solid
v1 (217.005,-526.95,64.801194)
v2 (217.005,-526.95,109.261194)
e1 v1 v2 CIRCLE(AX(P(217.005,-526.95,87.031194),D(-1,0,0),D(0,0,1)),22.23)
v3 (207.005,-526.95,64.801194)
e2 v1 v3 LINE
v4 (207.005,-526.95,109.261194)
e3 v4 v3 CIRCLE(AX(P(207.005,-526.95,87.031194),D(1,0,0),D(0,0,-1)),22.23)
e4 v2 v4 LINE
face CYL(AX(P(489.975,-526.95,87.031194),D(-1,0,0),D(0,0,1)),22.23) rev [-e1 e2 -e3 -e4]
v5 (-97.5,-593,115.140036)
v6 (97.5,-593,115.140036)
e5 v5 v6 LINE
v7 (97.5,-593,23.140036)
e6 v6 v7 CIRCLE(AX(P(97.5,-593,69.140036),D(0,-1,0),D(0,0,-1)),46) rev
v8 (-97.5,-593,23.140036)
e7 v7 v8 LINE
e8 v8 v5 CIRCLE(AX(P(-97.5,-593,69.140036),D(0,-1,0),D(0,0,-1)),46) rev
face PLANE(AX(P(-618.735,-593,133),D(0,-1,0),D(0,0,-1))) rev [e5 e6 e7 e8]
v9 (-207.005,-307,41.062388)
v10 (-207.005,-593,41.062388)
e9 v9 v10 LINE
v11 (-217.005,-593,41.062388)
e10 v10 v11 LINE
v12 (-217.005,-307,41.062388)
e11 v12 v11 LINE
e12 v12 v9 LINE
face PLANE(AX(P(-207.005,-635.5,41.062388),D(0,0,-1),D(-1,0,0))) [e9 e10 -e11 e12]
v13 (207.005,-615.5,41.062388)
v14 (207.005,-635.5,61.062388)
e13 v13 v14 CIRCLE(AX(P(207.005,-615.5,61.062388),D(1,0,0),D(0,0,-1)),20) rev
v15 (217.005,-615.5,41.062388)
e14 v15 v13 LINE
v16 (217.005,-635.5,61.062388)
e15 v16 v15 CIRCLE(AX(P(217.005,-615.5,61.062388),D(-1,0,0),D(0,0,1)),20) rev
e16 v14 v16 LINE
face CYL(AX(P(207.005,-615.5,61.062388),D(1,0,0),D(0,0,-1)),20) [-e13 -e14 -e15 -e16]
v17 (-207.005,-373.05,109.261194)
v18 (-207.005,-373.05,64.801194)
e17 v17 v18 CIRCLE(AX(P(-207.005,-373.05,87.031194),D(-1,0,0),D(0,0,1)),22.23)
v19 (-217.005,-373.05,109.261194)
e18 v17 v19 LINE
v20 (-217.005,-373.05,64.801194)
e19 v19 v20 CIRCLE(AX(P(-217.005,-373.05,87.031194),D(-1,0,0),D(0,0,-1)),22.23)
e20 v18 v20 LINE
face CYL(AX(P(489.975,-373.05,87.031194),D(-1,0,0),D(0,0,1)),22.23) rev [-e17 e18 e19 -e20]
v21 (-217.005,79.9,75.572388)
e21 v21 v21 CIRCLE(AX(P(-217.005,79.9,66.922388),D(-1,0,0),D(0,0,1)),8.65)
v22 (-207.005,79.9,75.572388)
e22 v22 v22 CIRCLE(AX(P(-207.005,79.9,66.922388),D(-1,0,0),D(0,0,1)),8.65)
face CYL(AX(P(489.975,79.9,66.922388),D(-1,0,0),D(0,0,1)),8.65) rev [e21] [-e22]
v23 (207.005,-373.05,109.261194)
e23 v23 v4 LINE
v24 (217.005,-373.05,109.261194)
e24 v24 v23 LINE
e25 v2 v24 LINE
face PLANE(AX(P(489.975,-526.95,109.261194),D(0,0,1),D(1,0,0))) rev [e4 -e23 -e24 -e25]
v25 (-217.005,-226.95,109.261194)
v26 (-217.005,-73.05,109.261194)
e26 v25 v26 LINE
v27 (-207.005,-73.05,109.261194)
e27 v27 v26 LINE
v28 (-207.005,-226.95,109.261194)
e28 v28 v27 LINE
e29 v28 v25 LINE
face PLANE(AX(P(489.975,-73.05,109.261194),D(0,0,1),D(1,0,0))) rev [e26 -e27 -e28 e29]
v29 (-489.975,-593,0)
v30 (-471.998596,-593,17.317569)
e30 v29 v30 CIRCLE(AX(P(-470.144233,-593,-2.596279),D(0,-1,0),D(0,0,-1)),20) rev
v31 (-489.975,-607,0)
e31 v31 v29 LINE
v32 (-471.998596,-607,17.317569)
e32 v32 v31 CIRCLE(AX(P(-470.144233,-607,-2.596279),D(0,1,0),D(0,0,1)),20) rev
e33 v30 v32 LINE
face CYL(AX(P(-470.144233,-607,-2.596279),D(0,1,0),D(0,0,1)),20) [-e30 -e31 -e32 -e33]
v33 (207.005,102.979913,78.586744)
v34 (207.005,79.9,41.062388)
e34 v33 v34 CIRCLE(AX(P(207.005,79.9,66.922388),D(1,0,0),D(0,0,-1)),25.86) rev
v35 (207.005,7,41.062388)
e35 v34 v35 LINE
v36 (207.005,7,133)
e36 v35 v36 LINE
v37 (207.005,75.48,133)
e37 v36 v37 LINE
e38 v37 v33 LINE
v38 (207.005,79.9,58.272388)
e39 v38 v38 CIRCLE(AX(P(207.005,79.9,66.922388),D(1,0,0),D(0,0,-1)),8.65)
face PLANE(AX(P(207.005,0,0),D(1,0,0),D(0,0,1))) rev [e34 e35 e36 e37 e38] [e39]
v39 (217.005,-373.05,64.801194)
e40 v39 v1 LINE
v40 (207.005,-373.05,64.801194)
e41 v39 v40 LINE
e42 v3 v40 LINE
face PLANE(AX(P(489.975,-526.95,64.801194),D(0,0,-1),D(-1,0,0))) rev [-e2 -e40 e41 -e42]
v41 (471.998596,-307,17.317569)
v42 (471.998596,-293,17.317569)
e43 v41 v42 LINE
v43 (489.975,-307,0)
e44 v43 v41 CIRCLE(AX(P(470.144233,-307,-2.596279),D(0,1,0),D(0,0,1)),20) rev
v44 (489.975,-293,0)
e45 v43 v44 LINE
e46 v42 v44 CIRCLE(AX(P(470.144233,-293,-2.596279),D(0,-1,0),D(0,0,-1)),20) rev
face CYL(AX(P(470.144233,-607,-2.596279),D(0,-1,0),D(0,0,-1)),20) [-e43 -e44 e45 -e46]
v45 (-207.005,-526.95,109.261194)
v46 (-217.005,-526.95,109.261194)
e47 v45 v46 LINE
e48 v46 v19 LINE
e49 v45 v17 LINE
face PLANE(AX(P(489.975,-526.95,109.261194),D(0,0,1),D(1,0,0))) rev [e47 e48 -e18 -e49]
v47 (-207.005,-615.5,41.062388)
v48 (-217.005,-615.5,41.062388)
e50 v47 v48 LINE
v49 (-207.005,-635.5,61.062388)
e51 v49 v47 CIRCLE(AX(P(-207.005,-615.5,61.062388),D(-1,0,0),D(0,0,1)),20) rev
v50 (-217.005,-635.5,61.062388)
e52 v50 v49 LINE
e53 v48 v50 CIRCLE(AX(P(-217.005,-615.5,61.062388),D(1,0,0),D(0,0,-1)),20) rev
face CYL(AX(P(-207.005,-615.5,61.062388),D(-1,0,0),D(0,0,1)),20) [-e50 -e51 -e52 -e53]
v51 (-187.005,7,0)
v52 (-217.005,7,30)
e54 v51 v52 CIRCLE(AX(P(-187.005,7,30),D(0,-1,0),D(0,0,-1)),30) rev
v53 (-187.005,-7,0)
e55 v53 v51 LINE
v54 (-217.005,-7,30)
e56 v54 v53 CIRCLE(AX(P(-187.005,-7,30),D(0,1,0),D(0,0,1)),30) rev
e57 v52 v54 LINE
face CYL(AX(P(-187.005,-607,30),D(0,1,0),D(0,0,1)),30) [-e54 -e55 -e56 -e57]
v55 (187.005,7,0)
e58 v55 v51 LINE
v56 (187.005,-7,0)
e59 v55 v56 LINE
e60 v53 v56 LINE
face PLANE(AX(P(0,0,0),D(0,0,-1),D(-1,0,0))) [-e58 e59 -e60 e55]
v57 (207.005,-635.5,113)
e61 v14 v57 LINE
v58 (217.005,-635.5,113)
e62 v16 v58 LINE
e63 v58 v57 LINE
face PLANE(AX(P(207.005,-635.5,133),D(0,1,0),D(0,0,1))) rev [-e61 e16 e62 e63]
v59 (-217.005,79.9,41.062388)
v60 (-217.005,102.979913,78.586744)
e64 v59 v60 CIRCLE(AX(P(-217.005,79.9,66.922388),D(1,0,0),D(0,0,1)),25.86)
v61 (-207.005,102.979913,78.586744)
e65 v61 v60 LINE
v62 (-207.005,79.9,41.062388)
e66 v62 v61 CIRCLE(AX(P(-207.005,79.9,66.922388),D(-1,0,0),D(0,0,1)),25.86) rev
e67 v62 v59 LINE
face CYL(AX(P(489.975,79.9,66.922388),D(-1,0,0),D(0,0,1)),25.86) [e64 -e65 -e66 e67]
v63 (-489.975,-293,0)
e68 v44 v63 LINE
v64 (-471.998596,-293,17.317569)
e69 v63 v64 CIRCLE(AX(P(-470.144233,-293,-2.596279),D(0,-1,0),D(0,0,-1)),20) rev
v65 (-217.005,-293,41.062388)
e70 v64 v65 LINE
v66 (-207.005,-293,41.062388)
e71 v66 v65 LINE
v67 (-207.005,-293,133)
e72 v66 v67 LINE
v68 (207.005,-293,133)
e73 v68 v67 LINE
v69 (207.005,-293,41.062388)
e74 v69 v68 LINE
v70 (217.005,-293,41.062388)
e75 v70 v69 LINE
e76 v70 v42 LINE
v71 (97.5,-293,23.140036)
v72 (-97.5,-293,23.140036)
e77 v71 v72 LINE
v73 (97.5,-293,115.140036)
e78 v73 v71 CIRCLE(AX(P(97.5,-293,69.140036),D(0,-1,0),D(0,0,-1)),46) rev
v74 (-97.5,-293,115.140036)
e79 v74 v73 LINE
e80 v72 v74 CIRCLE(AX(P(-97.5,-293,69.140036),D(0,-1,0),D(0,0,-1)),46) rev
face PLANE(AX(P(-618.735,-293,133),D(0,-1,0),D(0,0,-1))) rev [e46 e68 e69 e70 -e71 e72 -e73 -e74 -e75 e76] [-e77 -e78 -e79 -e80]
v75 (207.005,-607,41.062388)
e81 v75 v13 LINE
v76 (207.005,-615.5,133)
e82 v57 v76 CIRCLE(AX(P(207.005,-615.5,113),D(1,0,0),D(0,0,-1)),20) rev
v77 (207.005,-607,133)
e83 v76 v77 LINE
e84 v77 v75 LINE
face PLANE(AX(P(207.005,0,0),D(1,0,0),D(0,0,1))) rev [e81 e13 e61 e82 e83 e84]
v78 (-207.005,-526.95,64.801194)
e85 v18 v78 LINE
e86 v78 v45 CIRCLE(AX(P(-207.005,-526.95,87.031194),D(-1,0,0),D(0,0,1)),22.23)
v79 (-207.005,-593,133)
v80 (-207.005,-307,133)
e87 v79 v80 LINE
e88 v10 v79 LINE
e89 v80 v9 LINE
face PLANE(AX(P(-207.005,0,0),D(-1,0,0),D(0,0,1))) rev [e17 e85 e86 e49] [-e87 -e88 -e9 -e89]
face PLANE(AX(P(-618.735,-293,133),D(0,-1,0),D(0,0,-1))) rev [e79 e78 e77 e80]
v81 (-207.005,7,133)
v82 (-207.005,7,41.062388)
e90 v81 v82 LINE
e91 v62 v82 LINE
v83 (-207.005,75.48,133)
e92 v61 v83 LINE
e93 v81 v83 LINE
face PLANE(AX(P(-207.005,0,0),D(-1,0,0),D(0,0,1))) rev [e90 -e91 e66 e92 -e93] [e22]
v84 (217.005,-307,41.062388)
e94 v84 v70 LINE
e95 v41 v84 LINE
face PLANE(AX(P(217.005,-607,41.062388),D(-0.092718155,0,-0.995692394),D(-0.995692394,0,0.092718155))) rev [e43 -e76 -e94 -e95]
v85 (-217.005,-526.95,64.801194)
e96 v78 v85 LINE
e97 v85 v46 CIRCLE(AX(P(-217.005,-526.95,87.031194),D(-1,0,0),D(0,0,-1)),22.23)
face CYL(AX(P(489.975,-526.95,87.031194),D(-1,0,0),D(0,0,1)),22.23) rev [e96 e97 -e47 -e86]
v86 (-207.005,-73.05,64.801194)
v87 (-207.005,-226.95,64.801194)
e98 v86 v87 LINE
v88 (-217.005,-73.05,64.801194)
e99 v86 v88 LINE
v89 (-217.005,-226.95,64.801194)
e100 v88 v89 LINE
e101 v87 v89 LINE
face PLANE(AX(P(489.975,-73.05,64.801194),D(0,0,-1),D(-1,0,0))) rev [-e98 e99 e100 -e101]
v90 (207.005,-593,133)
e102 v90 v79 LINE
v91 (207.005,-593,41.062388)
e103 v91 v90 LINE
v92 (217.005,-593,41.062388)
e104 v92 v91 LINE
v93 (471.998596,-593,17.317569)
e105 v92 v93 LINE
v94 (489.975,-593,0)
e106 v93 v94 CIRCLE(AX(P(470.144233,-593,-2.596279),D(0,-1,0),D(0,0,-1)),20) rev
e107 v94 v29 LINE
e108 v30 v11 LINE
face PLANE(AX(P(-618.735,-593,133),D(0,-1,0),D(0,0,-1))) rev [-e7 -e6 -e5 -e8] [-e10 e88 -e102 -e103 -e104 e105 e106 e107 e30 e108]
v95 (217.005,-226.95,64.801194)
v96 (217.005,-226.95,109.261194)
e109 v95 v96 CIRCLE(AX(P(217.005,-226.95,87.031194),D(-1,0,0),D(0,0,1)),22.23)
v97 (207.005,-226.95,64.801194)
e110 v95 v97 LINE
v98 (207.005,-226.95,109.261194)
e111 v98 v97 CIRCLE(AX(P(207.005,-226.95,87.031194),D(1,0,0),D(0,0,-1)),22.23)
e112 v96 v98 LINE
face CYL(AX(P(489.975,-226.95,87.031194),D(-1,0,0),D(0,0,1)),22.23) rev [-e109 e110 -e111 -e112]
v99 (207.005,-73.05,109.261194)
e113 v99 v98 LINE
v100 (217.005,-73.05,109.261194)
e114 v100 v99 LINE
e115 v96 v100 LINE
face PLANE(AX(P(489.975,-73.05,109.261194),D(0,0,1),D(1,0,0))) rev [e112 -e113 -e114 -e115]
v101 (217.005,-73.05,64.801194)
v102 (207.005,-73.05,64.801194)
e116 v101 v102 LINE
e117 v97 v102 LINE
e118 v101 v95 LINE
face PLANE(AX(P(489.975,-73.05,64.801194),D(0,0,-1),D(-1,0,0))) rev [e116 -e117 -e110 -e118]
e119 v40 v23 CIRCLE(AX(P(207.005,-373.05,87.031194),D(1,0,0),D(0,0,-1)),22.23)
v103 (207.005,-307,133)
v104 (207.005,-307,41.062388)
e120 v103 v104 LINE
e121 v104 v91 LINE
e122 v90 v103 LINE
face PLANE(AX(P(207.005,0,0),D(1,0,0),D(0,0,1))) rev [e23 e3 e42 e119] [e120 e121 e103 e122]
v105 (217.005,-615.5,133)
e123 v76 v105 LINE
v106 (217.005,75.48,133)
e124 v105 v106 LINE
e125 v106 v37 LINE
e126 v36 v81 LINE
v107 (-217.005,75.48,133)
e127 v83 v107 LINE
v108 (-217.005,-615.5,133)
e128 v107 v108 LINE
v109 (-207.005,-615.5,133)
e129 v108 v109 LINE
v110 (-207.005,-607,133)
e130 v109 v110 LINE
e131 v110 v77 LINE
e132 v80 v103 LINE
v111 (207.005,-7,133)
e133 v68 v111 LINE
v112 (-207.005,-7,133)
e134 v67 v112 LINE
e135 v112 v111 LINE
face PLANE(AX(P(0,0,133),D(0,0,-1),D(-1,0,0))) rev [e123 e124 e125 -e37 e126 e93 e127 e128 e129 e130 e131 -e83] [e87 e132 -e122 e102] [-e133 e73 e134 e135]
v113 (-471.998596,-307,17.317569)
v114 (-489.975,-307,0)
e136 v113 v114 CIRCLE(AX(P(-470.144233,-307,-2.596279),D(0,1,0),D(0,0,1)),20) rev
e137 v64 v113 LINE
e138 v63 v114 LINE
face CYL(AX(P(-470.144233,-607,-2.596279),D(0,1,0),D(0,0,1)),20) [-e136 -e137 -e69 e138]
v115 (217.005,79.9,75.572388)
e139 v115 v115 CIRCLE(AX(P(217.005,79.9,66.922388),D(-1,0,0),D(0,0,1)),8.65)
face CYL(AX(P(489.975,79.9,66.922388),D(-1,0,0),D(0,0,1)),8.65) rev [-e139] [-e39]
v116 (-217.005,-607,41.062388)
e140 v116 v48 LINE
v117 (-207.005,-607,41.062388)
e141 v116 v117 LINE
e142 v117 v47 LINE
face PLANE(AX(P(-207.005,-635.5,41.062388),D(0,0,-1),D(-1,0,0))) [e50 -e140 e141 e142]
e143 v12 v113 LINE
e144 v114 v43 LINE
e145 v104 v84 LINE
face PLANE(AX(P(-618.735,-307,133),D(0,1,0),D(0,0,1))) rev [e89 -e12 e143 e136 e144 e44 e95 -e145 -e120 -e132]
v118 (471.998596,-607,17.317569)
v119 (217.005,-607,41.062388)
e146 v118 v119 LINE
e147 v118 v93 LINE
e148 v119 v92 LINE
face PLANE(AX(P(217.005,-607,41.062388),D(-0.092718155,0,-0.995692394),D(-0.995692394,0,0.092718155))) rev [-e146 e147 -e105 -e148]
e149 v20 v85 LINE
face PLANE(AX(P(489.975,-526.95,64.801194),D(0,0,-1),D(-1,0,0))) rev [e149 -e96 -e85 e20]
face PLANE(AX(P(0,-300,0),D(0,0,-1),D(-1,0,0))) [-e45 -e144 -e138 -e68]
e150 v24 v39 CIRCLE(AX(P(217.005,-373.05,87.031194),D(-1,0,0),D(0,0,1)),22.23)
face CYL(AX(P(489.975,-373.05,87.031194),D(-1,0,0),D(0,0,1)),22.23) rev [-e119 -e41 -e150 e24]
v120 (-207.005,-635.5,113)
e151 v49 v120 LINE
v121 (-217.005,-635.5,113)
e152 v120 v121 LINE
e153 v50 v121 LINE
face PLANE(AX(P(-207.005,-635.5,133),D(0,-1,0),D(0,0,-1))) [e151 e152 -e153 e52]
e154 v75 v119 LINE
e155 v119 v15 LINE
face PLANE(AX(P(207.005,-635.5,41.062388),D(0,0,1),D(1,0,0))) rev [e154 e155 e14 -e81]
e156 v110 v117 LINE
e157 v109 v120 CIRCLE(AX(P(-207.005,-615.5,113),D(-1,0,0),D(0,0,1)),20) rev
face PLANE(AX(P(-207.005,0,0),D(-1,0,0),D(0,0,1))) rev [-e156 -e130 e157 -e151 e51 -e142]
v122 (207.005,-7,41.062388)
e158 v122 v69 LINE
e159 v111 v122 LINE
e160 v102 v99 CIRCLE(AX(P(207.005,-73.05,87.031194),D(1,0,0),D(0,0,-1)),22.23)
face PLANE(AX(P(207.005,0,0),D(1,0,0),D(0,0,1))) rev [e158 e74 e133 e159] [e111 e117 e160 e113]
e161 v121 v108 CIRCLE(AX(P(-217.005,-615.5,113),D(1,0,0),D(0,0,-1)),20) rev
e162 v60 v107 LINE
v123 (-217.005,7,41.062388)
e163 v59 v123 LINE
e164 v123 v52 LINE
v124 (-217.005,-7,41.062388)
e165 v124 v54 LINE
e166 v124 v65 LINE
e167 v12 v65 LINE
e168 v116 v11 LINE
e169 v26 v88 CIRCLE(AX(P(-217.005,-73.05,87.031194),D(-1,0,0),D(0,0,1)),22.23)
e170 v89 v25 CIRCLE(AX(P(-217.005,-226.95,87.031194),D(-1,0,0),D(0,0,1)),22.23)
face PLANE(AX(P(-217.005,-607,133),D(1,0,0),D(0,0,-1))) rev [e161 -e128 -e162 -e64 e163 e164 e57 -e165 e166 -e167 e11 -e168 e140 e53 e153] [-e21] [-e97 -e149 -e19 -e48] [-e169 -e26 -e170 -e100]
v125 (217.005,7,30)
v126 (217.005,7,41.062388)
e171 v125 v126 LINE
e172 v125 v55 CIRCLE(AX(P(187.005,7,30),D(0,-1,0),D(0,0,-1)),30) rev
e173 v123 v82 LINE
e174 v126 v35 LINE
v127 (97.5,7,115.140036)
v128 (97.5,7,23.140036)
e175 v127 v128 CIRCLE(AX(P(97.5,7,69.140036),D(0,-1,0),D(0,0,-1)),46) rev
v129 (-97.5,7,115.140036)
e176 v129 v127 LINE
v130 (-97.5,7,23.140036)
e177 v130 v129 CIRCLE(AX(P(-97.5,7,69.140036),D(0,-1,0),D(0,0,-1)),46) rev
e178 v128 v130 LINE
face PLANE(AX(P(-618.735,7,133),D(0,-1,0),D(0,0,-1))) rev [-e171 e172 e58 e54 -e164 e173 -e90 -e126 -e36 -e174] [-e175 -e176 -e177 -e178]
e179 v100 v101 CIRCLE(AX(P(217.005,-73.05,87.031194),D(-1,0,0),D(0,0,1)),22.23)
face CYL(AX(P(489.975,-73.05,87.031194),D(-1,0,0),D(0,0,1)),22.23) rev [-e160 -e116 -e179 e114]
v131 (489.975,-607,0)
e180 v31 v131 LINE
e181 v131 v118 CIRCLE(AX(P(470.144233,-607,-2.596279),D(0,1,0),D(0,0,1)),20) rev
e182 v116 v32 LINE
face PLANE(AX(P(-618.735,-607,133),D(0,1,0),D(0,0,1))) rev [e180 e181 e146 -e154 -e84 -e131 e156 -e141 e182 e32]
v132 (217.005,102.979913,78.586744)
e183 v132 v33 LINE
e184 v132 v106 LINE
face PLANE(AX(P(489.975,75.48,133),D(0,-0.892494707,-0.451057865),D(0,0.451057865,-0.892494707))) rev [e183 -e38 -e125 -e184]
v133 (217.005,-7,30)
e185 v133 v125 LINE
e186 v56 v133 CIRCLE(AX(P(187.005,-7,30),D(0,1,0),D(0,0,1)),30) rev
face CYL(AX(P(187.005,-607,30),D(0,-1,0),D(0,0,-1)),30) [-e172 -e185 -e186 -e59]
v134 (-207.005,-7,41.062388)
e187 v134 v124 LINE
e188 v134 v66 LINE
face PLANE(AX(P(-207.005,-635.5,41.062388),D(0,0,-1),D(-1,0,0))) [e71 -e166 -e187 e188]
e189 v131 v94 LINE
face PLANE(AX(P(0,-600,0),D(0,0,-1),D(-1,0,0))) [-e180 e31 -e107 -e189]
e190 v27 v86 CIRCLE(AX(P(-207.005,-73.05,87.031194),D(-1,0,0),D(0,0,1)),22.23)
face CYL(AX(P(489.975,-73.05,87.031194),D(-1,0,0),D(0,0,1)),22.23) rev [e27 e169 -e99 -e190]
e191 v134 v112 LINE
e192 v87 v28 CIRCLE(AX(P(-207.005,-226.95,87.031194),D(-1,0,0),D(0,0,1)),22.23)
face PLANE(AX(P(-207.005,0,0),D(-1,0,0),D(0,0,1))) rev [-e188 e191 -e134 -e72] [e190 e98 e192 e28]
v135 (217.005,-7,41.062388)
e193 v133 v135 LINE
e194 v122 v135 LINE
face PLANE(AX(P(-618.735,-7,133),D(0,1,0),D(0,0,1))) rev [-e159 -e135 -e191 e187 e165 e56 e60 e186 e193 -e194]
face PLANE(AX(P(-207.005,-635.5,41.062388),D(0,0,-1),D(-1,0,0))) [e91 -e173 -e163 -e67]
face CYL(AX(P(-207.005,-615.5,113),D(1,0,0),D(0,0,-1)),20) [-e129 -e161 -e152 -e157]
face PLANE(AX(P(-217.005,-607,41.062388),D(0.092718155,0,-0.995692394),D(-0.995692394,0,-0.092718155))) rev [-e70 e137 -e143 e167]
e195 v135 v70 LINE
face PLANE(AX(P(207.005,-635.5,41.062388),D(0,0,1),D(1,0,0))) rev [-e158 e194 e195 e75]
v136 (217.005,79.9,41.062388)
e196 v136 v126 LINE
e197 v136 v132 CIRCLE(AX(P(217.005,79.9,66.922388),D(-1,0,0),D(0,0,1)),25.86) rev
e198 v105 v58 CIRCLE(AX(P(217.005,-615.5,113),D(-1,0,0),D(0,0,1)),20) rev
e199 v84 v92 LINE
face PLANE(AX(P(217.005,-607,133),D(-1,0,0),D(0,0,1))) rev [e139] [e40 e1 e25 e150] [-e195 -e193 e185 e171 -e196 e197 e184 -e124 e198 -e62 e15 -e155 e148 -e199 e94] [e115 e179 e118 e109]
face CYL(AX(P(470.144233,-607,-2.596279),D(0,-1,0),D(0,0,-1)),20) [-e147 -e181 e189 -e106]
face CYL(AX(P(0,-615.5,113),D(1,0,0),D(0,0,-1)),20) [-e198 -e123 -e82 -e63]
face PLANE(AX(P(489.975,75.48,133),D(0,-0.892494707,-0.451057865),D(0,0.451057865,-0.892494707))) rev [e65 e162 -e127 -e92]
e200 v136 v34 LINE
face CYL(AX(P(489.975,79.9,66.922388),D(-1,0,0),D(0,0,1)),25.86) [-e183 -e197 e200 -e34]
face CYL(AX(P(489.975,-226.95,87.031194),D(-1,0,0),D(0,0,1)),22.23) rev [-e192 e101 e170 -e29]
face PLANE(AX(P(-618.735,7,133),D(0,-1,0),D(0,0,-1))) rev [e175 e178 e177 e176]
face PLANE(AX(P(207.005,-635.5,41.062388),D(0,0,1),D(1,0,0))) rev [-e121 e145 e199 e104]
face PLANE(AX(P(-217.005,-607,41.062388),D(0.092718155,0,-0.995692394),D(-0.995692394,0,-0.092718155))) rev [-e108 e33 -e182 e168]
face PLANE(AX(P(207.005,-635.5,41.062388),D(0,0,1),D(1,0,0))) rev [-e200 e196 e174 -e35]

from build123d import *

# Parameters (mm, degrees)
SKETCH1_W           = 1237.47
SKETCH1_H           = 14
BOSS_EXTRUDE1_DEPTH = 133
LPATTERN3_COUNT     = 3
LPATTERN3_PITCH     = 300
CUT_EXTRUDE1_DEPTH  = 882.76981136
SKETCH3_W           = 91.937612072
SKETCH3_H           = 741.26
BOSS_EXTRUDE2_DEPTH = 10
SKETCH4_W           = 304.666106801
SKETCH4_H           = 263.446683033
CUT_EXTRUDE2_DEPTH  = 86
SKETCH5_R           = 8.65
CUT_EXTRUDE3_DEPTH  = 960.88018544
FILLET1_R           = 30
FILLET2_R           = 20
FILLET3_R           = 20
CUT_EXTRUDE4_DEPTH  = 960.88018544


with BuildPart() as part:
    # Sketch1 → Boss-Extrude1 (new body)
    with BuildSketch(Plane.XY):
        Rectangle(SKETCH1_W, SKETCH1_H)
    extrude(amount=BOSS_EXTRUDE1_DEPTH)


with BuildPart() as lpattern3_1:
    # LPattern3: pattern copy
    add(part.part.moved(Location(Vector(0, -1, 0) * (1 * LPATTERN3_PITCH))))


with BuildPart() as lpattern3_2:
    # LPattern3: pattern copy
    add(part.part.moved(Location(Vector(0, -1, 0) * (2 * LPATTERN3_PITCH))))


with BuildPart() as cut_extrude1_tool:
    # Sketch2 → Cut-Extrude1 (new, through all)
    with BuildSketch(Plane(origin=(0, 7, 0), x_dir=(1, 0, 0), z_dir=(0, 1, 0))):
        Polygon((-618.735, 0), (-618.735, -133), (-217.005, -133), (-217.005, -41.062387928), (-488.639842036, -15.767947981), (-489.975, 0), align=None)
        Polygon((217.005, -41.062387928), (488.639842036, -15.767947981), (489.975, 0), (618.735, 0), (618.735, -133), (217.005, -133), align=None)
    extrude(amount=-CUT_EXTRUDE1_DEPTH)


with BuildPart() as part_1:
    add(part.part)

    # Cut-Extrude1: cut by cut_extrude1_tool
    add(cut_extrude1_tool.part, mode=Mode.SUBTRACT)



with BuildPart() as lpattern3_1_1:
    add(lpattern3_1.part)

    # Cut-Extrude1: cut by cut_extrude1_tool
    add(cut_extrude1_tool.part, mode=Mode.SUBTRACT)


with BuildPart() as lpattern3_2_1:
    add(lpattern3_2.part)

    # Cut-Extrude1: cut by cut_extrude1_tool
    add(cut_extrude1_tool.part, mode=Mode.SUBTRACT)


with BuildPart() as part_2:
    add(part_1.part)

    add(lpattern3_1_1.part)  # Boss-Extrude2 merges LPattern3_1

    add(lpattern3_2_1.part)  # Boss-Extrude2 merges LPattern3_2
    # Sketch3 → Boss-Extrude2 (add)
    with BuildSketch(Plane.ZY.offset(217.005)):
        with Locations((87.031193964, -264.87)):
            Rectangle(SKETCH3_W, SKETCH3_H)
    boss_extrude2 = extrude(amount=-BOSS_EXTRUDE2_DEPTH)

    # Mirror1: Boss-Extrude2 across plane
    add(boss_extrude2.mirror(Plane(origin=(0, 0, 0), x_dir=(0, 0, 1), z_dir=(1, 0, 0))))

    # Sketch4 → Cut-Extrude2 (cut)
    with BuildSketch(Plane(origin=(0, 7, 0), x_dir=(1, 0, 0), z_dir=(0, 1, 0))):
        with Locations((-369.338053401, -91.037881314)):
            Rectangle(SKETCH4_W, SKETCH4_H)
        with Locations((369.338053401, -91.037881314)):
            Rectangle(SKETCH4_W, SKETCH4_H)
    extrude(amount=-CUT_EXTRUDE2_DEPTH, mode=Mode.SUBTRACT)

    # Sketch5 → Cut-Extrude3 (cut, through all)
    with BuildSketch(Plane.ZY.offset(217.005)):
        with Locations((66.922387928, 79.9)):
            Circle(SKETCH5_R)
        with BuildLine():
            Line((133, 75.48), (78.58674431, 102.979913133))
            ThreePointArc((78.58674431, 102.979913133), (53.374337442, 101.927027217), (41.062387928, 79.9))
            Line((41.062387928, 79.9), (30.442053439, 79.9))
            Line((30.442053439, 79.9), (30.442053439, 120.292255017))
            Line((30.442053439, 120.292255017), (142.138652578, 120.292255017))
            Line((142.138652578, 120.292255017), (142.138652578, 75.48))
            Line((142.138652578, 75.48), (133, 75.48))
        make_face()
    extrude(amount=-CUT_EXTRUDE3_DEPTH, mode=Mode.SUBTRACT)

    # Fillet1
    fillet1_edges = [part_2.edges().sort_by_distance(p)[0] for p in [
        (-217.005, 0, 0),
        (217.005, 0, 0),
    ]]
    fillet(fillet1_edges, radius=FILLET1_R)

    # Fillet2
    fillet2_edges = [part_2.edges().sort_by_distance(p)[0] for p in [
        (212.005, -635.5, 133),
        (212.005, -635.5, 41.062387928),
        (-212.005, -635.5, 41.062387928),
        (-212.005, -635.5, 133),
    ]]
    fillet(fillet2_edges, radius=FILLET2_R)

    # Fillet3
    # the kernel refuses this fillet: 20 mm, written as the material it takes off along each edge
    with BuildSketch(Plane(origin=(488.639842036, -251.216899092, 15.767947981), x_dir=(-0.995692394104561, 0, 0.0927181553005003), z_dir=(0, -1, 0))) as fillet3_piece_1:
        with BuildLine():
            CenterArc((16.713240363, 20), FILLET3_R, 192.778841583, 77.221158417)
            Line((-2.79138168, 15.576232492), (-3.181474121, 15.487757141))
            ThreePointArc((-3.181474121, 15.487757141), (-1.789418438, 7.717557206), (-0.393727599, -0.07055904))
            Line((-0.393727599, -0.07055904), (0, -0.4))
            Line((0, -0.4), (16.713240363, -0.4))
            Line((16.713240363, -0.4), (16.713240363, 0))
        make_face()
    extrude(amount=97.566201815, mode=Mode.SUBTRACT)
    with BuildSketch(Plane(origin=(488.639842036, -551.216899092, 15.767947981), x_dir=(0.08437350613868201, 0, -0.996434198259908), z_dir=(0, -1, 0))) as fillet3_piece_2:
        with BuildLine():
            CenterArc((16.738204459, -19.979111965), FILLET3_R, 92.618841583, 77.221158417)
            Line((-2.948175473, -16.451159984), (-3.341903071, -16.380600944))
            Line((-3.341903071, -16.380600944), (-0.393727599, 0.07055904))
            Line((-0.393727599, 0.07055904), (0, 0.4))
            ThreePointArc((0, 0.4), (7.912187282, 0.4), (15.806097965, 0.399582239))
            Line((15.806097965, 0.399582239), (15.824374563, 0))
        make_face()
    extrude(amount=97.566201815, mode=Mode.SUBTRACT)
    with BuildSketch(Plane(origin=(-488.639842036, -551.216899092, 15.767947981), x_dir=(0.995692394104561, 0, 0.0927181553005003), z_dir=(0, -1, 0)), Plane(origin=(-488.639842036, -251.216899092, 15.767947981), x_dir=(0.995692394104561, 0, 0.0927181553005003), z_dir=(0, -1, 0))) as fillet3_piece_3:
        with BuildLine():
            CenterArc((16.713240363, -20), FILLET3_R, 90, 77.221158417)
            Line((-2.79138168, -15.576232492), (-3.181474121, -15.487757141))
            ThreePointArc((-3.181474121, -15.487757141), (-1.789418438, -7.717557206), (-0.393727599, 0.07055904))
            Line((-0.393727599, 0.07055904), (0, 0.4))
            Line((0, 0.4), (16.713240363, 0.4))
            Line((16.713240363, 0.4), (16.713240363, 0))
        make_face()
    extrude(amount=97.566201815, mode=Mode.SUBTRACT)

    # Sketch6 → Cut-Extrude4 (cut, through all)
    with BuildSketch(Plane.ZY.offset(217.005)):
        with BuildLine():
            Line((109.261193964, -73.05), (109.261193964, -226.95))
            ThreePointArc((109.261193964, -226.95), (87.031193964, -249.18), (64.801193964, -226.95))
            Line((64.801193964, -226.95), (64.801193964, -73.05))
            ThreePointArc((64.801193964, -73.05), (87.031193964, -50.82), (109.261193964, -73.05))
        make_face()
        with BuildLine():
            Line((109.261193964, -526.95), (109.261193964, -373.05))
            ThreePointArc((109.261193964, -373.05), (87.031193964, -350.82), (64.801193964, -373.05))
            Line((64.801193964, -373.05), (64.801193964, -526.95))
            ThreePointArc((64.801193964, -526.95), (87.031193964, -549.18), (109.261193964, -526.95))
        make_face()
    extrude(amount=-CUT_EXTRUDE4_DEPTH, mode=Mode.SUBTRACT)


solid = part_2.part
